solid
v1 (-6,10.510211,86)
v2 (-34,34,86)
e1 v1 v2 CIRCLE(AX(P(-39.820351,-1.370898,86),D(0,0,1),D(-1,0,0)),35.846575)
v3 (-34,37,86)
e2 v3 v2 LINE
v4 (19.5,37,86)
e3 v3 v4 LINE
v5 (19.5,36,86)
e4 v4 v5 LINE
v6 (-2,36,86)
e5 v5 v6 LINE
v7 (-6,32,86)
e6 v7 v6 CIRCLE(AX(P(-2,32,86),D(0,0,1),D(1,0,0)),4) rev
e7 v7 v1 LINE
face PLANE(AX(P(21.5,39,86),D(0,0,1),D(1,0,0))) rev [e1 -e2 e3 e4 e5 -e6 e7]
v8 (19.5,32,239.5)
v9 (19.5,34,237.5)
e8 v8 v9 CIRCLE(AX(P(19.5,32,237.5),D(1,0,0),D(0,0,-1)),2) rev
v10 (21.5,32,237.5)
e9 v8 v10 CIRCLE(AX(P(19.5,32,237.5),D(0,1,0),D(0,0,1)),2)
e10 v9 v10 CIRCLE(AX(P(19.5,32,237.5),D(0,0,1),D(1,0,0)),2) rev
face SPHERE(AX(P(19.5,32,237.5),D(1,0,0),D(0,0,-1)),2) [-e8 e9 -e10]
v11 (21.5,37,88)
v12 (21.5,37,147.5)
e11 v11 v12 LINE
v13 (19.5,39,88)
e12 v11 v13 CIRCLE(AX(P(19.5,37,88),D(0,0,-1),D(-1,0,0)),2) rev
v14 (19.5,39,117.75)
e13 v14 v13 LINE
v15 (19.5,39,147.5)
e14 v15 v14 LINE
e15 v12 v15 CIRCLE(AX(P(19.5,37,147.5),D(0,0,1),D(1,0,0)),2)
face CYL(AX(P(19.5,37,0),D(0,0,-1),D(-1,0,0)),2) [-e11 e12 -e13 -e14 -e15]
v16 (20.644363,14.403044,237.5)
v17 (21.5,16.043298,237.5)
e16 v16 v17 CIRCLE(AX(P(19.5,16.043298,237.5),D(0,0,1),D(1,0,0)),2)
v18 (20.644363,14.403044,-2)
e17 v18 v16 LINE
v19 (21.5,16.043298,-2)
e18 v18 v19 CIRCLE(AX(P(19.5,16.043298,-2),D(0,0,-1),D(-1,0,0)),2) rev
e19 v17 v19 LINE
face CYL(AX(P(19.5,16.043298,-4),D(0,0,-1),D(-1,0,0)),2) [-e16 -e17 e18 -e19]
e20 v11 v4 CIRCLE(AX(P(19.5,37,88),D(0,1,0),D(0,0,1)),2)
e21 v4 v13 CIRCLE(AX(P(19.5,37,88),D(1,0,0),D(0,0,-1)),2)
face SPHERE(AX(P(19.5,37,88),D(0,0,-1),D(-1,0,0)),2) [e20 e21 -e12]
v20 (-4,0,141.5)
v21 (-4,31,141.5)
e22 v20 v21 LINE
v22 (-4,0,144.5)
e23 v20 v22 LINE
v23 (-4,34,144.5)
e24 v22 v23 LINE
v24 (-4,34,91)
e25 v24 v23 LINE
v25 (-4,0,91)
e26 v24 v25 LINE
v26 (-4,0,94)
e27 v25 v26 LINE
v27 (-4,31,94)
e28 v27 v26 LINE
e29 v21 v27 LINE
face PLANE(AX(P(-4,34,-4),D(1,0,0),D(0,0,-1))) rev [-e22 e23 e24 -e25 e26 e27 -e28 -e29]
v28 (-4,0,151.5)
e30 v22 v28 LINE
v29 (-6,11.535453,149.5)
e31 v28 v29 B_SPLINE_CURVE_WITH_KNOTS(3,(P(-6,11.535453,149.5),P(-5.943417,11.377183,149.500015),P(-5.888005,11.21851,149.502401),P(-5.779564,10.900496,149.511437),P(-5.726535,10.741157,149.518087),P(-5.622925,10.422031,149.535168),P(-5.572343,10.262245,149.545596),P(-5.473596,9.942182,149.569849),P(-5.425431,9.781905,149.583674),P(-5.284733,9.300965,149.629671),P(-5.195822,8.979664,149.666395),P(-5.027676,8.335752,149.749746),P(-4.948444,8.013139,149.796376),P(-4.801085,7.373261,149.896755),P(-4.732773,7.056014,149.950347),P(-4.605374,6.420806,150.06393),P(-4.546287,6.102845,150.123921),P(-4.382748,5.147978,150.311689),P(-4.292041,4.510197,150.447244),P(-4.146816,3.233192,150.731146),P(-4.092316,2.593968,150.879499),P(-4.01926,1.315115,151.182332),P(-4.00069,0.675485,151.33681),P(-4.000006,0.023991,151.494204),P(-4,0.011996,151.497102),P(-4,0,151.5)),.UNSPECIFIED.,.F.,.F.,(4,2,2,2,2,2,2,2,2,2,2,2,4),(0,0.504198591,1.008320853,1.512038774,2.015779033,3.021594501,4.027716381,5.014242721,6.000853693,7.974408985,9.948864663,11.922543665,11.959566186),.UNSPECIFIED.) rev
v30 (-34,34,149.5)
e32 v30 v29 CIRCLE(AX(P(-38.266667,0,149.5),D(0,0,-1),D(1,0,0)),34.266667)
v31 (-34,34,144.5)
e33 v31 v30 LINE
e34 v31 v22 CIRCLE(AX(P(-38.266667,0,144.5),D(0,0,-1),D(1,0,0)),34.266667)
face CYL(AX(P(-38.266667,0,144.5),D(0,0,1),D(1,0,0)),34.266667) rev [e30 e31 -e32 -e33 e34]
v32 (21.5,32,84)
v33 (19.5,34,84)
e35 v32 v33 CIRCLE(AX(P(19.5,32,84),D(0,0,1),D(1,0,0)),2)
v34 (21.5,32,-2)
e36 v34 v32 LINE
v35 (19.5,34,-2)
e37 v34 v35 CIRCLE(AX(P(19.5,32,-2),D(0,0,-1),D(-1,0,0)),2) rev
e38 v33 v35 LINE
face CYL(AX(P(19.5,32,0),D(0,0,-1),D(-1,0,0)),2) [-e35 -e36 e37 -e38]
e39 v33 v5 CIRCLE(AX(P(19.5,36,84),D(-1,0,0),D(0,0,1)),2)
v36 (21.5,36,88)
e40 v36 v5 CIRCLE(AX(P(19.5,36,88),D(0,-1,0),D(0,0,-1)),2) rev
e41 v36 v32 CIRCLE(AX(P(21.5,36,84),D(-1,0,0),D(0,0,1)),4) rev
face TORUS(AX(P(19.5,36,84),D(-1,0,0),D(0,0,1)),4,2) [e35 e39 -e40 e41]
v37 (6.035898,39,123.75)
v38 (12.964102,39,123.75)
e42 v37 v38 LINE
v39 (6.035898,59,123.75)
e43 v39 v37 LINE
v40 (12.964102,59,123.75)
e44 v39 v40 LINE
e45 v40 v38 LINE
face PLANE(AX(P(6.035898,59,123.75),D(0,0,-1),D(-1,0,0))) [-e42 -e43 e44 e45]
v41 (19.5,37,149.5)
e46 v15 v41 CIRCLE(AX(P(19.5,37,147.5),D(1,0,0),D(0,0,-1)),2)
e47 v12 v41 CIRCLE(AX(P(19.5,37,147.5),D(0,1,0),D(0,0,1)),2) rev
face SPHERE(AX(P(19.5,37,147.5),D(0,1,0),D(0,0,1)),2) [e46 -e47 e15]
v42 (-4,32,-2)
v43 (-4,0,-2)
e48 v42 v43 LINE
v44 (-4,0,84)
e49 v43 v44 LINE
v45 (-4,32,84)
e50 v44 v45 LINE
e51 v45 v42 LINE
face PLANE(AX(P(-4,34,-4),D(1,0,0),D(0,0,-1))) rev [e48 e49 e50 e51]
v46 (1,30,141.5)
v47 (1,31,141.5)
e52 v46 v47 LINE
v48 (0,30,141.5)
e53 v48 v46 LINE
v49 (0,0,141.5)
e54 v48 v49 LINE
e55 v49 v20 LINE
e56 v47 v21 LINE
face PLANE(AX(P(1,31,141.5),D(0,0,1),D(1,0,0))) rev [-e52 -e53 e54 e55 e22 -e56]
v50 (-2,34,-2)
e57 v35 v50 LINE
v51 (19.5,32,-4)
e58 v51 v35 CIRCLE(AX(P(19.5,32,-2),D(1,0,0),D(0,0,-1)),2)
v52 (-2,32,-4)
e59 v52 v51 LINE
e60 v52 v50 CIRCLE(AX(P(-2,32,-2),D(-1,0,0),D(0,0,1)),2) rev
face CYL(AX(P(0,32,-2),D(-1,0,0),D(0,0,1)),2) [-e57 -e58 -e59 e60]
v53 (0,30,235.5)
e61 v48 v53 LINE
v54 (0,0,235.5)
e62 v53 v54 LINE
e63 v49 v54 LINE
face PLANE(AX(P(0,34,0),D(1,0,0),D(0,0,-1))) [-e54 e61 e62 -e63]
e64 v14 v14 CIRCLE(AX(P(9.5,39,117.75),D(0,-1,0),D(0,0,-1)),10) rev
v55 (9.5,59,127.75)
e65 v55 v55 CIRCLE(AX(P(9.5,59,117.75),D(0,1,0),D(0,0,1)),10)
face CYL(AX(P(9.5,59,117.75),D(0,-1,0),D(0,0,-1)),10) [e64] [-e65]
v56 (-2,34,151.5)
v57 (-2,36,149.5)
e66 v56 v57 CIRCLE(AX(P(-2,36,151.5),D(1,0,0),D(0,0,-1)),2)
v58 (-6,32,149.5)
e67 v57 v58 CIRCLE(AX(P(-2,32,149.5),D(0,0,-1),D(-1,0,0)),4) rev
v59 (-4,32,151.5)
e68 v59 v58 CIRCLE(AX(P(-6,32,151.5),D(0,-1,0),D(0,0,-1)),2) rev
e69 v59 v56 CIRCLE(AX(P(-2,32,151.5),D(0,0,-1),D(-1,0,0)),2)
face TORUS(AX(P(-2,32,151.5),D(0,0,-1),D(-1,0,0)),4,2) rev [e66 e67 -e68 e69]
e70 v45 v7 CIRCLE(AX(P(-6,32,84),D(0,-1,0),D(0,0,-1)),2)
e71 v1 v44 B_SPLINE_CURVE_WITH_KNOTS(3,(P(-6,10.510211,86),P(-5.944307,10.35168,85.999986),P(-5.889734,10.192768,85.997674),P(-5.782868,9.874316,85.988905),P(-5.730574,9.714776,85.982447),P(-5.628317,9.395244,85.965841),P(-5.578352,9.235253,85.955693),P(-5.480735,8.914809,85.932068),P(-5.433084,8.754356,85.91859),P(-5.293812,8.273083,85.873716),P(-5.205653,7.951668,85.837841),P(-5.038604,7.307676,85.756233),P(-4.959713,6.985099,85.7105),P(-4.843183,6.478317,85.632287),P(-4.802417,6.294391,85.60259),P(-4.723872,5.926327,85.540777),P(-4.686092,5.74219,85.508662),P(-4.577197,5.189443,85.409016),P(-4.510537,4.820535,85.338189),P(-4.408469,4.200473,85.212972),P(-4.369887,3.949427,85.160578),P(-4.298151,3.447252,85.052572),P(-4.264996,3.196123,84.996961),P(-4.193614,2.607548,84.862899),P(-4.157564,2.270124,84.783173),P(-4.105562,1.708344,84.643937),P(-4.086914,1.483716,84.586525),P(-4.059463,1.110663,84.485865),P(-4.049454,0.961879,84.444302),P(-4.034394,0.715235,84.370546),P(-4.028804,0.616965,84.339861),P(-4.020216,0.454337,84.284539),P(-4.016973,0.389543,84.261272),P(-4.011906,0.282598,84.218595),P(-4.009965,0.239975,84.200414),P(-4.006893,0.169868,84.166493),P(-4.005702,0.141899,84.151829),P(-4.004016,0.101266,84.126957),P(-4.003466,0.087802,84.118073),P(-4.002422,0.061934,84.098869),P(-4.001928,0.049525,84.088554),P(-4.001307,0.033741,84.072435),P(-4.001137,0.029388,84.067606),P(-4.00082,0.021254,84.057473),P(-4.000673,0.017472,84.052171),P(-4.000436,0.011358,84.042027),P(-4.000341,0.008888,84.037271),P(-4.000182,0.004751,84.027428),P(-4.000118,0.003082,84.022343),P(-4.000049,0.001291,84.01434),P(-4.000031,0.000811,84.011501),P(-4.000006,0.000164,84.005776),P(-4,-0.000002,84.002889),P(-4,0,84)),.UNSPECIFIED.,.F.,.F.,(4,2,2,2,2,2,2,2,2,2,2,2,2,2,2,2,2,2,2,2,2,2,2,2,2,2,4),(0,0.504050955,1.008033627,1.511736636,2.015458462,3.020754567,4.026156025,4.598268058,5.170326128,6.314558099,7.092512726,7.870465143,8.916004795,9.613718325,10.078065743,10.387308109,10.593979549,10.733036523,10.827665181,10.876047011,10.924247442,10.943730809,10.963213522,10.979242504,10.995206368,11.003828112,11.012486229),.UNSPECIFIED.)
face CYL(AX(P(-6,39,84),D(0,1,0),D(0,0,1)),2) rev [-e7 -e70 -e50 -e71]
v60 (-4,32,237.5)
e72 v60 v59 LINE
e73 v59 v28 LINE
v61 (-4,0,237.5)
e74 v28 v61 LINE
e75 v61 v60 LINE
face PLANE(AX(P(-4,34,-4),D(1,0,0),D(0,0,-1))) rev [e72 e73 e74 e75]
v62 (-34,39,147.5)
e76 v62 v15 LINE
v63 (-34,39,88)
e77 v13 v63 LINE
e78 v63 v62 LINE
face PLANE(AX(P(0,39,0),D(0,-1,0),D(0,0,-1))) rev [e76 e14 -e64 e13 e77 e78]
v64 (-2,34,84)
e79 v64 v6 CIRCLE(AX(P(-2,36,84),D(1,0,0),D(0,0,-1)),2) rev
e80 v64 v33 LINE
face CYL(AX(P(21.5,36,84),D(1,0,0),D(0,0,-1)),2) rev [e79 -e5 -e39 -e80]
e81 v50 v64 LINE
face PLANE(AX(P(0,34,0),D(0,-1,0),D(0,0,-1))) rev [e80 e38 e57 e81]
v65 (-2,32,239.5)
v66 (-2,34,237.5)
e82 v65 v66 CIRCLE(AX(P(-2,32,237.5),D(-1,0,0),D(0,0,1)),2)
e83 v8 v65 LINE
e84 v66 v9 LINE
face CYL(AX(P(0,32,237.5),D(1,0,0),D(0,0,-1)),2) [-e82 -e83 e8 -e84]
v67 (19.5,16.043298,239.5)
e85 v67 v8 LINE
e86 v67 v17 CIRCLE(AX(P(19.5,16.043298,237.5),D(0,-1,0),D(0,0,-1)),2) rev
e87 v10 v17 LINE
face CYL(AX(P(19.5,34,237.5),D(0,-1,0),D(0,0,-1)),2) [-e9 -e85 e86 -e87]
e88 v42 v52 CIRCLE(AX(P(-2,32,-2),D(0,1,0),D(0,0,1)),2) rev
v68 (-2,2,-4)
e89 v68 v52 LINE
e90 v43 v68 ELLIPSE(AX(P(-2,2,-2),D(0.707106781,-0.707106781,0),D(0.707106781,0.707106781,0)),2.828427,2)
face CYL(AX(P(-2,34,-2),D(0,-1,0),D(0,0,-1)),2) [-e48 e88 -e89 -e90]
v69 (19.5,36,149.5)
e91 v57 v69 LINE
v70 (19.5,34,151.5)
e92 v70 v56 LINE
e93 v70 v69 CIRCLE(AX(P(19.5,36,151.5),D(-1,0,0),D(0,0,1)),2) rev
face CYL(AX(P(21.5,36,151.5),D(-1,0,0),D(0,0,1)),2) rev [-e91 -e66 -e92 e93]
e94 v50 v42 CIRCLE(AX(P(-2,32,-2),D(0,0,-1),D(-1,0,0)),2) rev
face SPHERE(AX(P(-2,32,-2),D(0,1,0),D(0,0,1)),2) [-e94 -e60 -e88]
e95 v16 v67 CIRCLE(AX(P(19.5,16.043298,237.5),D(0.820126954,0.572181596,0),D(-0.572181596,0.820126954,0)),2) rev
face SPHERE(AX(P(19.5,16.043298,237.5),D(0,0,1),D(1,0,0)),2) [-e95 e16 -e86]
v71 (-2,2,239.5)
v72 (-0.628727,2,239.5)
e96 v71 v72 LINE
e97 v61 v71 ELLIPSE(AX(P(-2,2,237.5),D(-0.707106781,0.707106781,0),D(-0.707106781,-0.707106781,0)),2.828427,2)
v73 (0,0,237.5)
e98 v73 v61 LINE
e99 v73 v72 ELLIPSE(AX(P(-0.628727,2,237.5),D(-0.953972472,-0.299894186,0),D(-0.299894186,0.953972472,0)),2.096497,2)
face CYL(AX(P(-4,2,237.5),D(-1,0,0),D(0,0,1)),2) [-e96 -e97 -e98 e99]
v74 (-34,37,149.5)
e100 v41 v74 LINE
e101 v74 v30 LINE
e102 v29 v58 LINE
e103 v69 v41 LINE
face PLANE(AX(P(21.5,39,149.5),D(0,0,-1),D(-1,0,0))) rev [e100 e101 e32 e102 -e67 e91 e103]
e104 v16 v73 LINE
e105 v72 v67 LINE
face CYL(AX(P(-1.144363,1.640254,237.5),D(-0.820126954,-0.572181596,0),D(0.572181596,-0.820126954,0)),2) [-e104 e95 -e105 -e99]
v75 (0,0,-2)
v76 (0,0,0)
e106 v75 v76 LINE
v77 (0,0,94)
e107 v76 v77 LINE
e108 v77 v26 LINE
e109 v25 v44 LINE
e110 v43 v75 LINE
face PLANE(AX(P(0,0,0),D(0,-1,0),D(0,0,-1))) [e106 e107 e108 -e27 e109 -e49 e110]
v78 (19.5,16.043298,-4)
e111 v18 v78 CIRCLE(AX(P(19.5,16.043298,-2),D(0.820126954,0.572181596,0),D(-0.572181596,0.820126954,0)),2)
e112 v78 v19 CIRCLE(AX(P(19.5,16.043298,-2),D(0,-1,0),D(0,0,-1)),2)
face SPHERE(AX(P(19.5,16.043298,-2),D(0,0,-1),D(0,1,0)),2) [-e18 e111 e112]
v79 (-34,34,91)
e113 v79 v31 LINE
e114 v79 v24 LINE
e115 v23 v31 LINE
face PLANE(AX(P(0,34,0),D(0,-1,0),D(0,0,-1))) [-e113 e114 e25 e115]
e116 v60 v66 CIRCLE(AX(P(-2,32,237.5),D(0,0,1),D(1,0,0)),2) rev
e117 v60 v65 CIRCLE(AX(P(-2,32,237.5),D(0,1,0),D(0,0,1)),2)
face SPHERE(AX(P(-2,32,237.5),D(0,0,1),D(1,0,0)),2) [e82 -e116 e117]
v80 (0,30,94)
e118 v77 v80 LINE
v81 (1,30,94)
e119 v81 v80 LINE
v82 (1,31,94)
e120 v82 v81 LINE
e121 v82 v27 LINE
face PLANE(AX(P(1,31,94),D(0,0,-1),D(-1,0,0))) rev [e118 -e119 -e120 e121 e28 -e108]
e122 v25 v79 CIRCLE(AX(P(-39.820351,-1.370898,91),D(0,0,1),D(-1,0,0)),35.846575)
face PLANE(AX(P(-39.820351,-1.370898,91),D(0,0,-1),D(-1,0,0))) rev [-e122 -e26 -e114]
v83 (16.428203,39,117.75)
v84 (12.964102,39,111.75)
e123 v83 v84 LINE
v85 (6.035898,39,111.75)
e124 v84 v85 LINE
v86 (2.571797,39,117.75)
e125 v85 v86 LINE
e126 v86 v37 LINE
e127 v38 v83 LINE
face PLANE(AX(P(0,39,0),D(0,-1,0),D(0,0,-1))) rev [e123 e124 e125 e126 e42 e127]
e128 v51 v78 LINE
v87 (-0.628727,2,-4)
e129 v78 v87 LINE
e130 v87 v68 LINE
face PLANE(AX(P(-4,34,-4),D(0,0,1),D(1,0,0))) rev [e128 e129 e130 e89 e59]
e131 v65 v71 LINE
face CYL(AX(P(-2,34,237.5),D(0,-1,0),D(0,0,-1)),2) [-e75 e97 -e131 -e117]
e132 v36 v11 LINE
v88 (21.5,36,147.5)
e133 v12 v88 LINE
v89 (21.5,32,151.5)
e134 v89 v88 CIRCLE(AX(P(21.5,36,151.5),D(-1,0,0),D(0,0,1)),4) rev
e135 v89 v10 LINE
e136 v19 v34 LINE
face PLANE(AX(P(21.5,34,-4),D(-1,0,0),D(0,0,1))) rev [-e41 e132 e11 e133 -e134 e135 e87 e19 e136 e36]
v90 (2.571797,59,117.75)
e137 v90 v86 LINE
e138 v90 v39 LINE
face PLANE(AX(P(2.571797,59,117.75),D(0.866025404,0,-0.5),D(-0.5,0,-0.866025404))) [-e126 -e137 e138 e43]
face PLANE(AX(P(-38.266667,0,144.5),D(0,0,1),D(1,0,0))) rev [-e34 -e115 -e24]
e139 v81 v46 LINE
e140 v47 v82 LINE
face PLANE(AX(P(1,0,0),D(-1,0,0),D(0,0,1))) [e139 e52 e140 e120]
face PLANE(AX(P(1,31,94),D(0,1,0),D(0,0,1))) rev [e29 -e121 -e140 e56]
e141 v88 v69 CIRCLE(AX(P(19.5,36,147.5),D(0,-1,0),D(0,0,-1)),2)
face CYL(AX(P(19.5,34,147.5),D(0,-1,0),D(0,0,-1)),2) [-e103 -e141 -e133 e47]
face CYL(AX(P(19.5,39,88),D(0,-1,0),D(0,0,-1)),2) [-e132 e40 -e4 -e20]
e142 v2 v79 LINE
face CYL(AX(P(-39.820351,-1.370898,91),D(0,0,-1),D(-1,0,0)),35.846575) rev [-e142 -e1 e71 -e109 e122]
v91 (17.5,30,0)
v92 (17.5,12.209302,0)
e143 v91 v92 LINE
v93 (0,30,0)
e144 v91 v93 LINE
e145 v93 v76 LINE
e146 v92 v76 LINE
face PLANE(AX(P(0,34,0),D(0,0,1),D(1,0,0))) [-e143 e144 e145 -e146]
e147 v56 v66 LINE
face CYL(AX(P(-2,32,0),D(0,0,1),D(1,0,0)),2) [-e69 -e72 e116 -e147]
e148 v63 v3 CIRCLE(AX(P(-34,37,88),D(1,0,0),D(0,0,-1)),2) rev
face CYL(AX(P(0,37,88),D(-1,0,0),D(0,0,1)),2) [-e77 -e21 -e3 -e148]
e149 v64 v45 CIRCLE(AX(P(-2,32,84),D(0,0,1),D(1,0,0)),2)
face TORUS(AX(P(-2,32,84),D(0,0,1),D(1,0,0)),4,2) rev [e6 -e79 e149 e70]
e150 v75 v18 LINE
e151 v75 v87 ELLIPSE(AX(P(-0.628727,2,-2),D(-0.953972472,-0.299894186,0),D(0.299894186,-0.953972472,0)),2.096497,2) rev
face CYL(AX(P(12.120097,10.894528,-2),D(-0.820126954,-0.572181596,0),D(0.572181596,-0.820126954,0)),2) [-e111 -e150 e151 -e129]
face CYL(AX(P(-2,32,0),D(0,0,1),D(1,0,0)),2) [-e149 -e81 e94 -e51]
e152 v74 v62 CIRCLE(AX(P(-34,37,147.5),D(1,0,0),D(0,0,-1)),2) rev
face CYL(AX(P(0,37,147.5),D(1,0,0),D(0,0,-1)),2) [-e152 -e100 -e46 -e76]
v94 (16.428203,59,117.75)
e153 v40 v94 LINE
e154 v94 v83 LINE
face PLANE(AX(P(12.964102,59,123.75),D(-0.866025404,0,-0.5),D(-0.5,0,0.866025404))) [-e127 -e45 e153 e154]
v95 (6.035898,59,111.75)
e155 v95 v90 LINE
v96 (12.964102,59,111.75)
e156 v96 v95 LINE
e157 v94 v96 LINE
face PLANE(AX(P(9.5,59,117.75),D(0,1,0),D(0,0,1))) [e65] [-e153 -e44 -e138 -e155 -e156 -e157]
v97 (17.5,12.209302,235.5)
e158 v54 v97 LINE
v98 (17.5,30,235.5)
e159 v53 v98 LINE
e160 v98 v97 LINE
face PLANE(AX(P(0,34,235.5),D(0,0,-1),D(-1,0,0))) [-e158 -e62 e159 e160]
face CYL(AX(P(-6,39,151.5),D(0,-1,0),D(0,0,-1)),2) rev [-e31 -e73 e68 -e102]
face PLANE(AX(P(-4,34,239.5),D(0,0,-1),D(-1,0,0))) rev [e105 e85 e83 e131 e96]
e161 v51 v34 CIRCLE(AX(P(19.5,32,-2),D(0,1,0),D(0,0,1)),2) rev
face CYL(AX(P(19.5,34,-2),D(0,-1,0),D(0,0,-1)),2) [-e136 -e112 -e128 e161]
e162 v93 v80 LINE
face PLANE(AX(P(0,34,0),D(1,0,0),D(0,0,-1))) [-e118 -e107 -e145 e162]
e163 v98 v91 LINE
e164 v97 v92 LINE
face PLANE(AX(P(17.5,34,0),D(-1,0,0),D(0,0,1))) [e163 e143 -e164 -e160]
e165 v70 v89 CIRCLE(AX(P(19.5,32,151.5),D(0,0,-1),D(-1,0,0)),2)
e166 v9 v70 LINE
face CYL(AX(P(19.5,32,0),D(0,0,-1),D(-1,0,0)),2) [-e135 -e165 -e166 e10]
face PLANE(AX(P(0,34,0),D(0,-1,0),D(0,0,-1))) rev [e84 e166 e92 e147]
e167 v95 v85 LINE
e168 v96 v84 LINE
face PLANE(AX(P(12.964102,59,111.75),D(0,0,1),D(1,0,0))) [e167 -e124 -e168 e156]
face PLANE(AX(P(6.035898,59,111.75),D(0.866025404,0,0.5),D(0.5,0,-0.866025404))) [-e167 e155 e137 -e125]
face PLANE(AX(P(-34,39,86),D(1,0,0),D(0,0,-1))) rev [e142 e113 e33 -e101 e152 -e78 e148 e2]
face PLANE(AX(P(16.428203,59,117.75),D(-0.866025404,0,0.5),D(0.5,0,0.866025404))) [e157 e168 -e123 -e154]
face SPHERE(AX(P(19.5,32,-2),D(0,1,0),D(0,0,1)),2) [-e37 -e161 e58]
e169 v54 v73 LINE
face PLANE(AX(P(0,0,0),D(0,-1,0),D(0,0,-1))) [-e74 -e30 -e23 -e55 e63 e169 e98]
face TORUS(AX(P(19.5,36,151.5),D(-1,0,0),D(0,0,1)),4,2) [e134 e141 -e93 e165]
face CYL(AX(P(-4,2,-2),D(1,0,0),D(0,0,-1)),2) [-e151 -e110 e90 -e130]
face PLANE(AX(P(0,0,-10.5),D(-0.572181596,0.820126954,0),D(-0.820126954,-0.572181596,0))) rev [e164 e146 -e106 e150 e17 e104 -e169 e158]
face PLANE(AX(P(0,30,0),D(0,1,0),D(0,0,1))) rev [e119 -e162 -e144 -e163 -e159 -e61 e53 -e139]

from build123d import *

# Parameters (mm, degrees)
SKETCH1_W                         = 25.5
SKETCH1_H                         = 243.5
SKETCH1_W_2                       = 17.5
SKETCH1_H_2                       = 235.5
MOTOR_PANEL_CONNECTOR_DEPTH       = 34
SKETCH3_W                         = 25.5
SKETCH3_H                         = 243.5
MOTOR_PANEL_CONNECCTOR_BASE_DEPTH = 4
UP_DOWN_CONNECT_CUT_DEPTH         = 250
SKETCH5_W                         = 47.5
SKETCH5_H                         = 31
CUT_TO_NAIL_PART_DEPTH            = 5
SKETCH6_W                         = 55.5
SKETCH6_H                         = 63.5
PANEL_CONNECTOR_DEPTH             = 5
SKETCH7_R                         = 10
BOSS_EXTRUDE4_DEPTH               = 20
BOSS_EXTRUDE5_DEPTH               = 5
BOSS_EXTRUDE6_DEPTH               = 5
FILLET1_R                         = 2


with BuildPart() as part:
    # Sketch1 → motor -panel connector (new body)
    with BuildSketch(Plane(origin=(0, 0, 0), x_dir=(1, 0, 0), z_dir=(0, 1, 0))):
        with Locations((8.75, -117.75)):
            Rectangle(SKETCH1_W, SKETCH1_H)
        with Locations((8.75, -117.75)):
            Rectangle(SKETCH1_W_2, SKETCH1_H_2, mode=Mode.SUBTRACT)
    extrude(amount=MOTOR_PANEL_CONNECTOR_DEPTH)

    # Sketch3 → motor-panel connecctor base (add)
    with BuildSketch(Plane(origin=(0, 34, 0), x_dir=(1, 0, 0), z_dir=(0, 1, 0))):
        with Locations((8.75, -117.75)):
            Rectangle(SKETCH3_W, SKETCH3_H)
    extrude(amount=-MOTOR_PANEL_CONNECCTOR_BASE_DEPTH)

    # Sketch4 → up down connect cut (cut)
    with BuildSketch(Plane.XY.offset(239.5)):
        Polygon((0, 0), (21.5, 15), (21.5, 0), align=None)
    extrude(amount=-UP_DOWN_CONNECT_CUT_DEPTH, mode=Mode.SUBTRACT)

    # Sketch5 → cut to nail part (cut)
    with BuildSketch(Plane.ZY.offset(4)):
        with Locations((117.75, 15.5)):
            Rectangle(SKETCH5_W, SKETCH5_H)
    extrude(amount=-CUT_TO_NAIL_PART_DEPTH, mode=Mode.SUBTRACT)

    # Sketch6 → panel connector (add)
    with BuildSketch(Plane(origin=(0, 34, 0), x_dir=(1, 0, 0), z_dir=(0, 1, 0))):
        with Locations((-6.25, -117.75)):
            Rectangle(SKETCH6_W, SKETCH6_H)
    extrude(amount=PANEL_CONNECTOR_DEPTH)

    # Sketch7 → Boss-Extrude4 (add)
    with BuildSketch(Plane(origin=(0, 39, 0), x_dir=(1, 0, 0), z_dir=(0, 1, 0))):
        with Locations(Location((9.5, -117.75, 0), (0, 0, 90))):
            Circle(SKETCH7_R)
        Polygon((12.964101615, -123.75), (16.42820323, -117.75), (12.964101615, -111.75), (6.035898385, -111.75), (2.57179677, -117.75), (6.035898385, -123.75), align=None, mode=Mode.SUBTRACT)
    extrude(amount=BOSS_EXTRUDE4_DEPTH)

    # Sketch8 → Boss-Extrude5 (add)
    with BuildSketch(Plane.XY.offset(149.5)):
        with BuildLine():
            Line((-34, 34), (-4, 34))
            Line((-4, 34), (-4, 0))
            ThreePointArc((-4, 0), (-12.572222823, 22.671568098), (-34, 34))
        make_face()
    extrude(amount=-BOSS_EXTRUDE5_DEPTH)

    # Sketch13 → Boss-Extrude6 (add)
    with BuildSketch(Plane(origin=(0, 0, 86), x_dir=(-1, 0, 0), z_dir=(0, 0, -1))):
        with BuildLine():
            Line((4, 0), (4, 34))
            Line((4, 34), (34, 34))
            ThreePointArc((34, 34), (12.941232514, 22.345971311), (4, 0))
        make_face()
    extrude(amount=-BOSS_EXTRUDE6_DEPTH)

    # Fillet1
    # the kernel refuses this fillet: 2 mm, written as the material it takes off along each edge
    with BuildSketch(Plane(origin=(-2, 32, 237.5), x_dir=(0, 1, 0), z_dir=(-1, 0, 0))) as fillet1_piece_1_section:
        Polygon((0, 0), (FILLET1_R * 1.02, 0), (FILLET1_R * 1.02, -FILLET1_R * 1.02), (0, -FILLET1_R * 1.02), align=None)
    fillet1_piece_1 = extrude(amount=FILLET1_R * 1.02, mode=Mode.PRIVATE)
    fillet1_piece_1 = fillet1_piece_1 - Plane(origin=(-2, 32, 237.5), x_dir=(0, -0.7071067811865475, -0.7071067811865475), z_dir=(-1, 0, 0)) * Sphere(FILLET1_R, mode=Mode.PRIVATE)
    add(fillet1_piece_1, mode=Mode.SUBTRACT)
    with BuildSketch(Plane(origin=(-2, 32, -2), x_dir=(0, 1, 0), z_dir=(-1, 0, 0))) as fillet1_piece_2_section:
        Polygon((0, 0), (FILLET1_R * 1.02, 0), (FILLET1_R * 1.02, FILLET1_R * 1.02), (0, FILLET1_R * 1.02), align=None)
    fillet1_piece_2 = extrude(amount=FILLET1_R * 1.02, mode=Mode.PRIVATE)
    fillet1_piece_2 = fillet1_piece_2 - Plane(origin=(-2, 32, -2), x_dir=(0, -0.7071067811865475, 0.7071067811865475), z_dir=(-1, 0, 0)) * Sphere(FILLET1_R, mode=Mode.PRIVATE)
    add(fillet1_piece_2, mode=Mode.SUBTRACT)
    with BuildSketch(Plane(origin=(19.5, 16.043297996, 237.5), x_dir=(0.5721815960240814, -0.8201269543011832, 0), z_dir=(0, 0, 1))) as fillet1_piece_3_section:
        Polygon((0, 0), (FILLET1_R * 1.02, 0), (FILLET1_R * 1.02, FILLET1_R * 0.532081978), (FILLET1_R * 0.583625227945, FILLET1_R * 0.836529493387), align=None)
    fillet1_piece_3 = extrude(amount=FILLET1_R * 1.02, mode=Mode.PRIVATE)
    fillet1_piece_3 = fillet1_piece_3 - Plane(origin=(19.5, 16.043297996, 237.5), x_dir=(-0.886617616569872, 0.4625031913273241, 0), z_dir=(0, 0, 1)) * Sphere(FILLET1_R, mode=Mode.PRIVATE)
    add(fillet1_piece_3, mode=Mode.SUBTRACT)
    with BuildSketch(Plane(origin=(19.5, 16.043297996, -2), x_dir=(0.5721815960240814, -0.8201269543011832, 0), z_dir=(0, 0, -1))) as fillet1_piece_4_section:
        Polygon((0, 0), (FILLET1_R * 1.02, 0), (FILLET1_R * 1.02, -FILLET1_R * 0.532081978), (FILLET1_R * 0.583625227945, -FILLET1_R * 0.836529493387), align=None)
    fillet1_piece_4 = extrude(amount=FILLET1_R * 1.02, mode=Mode.PRIVATE)
    fillet1_piece_4 = fillet1_piece_4 - Plane(origin=(19.5, 16.043297996, -2), x_dir=(-0.886617616569872, 0.4625031913273241, 0), z_dir=(0, 0, -1)) * Sphere(FILLET1_R, mode=Mode.PRIVATE)
    add(fillet1_piece_4, mode=Mode.SUBTRACT)
    with BuildSketch(Plane(origin=(21.5, 39, 154.5), x_dir=(0, -1, 0), z_dir=(0, 0, -1))) as fillet1_piece_5:
        with BuildLine():
            CenterArc((FILLET1_R, FILLET1_R), FILLET1_R, 180, 90)
            Line((0, FILLET1_R), (0, 0))
            Line((0, 0), (FILLET1_R, 0))
        make_face()
    extrude(amount=73.5, mode=Mode.SUBTRACT)
    with BuildSketch(Plane(origin=(26.5, 39, 86), x_dir=(0, -1, 0), z_dir=(-1, 0, 0))) as fillet1_piece_6:
        with BuildLine():
            CenterArc((FILLET1_R, FILLET1_R), FILLET1_R, 180, 90)
            Line((0, FILLET1_R), (0, 0))
            Line((0, 0), (FILLET1_R, 0))
        make_face()
    extrude(amount=65.5, mode=Mode.SUBTRACT)
    with BuildSketch(Plane(origin=(-39, 39, 149.5), x_dir=(0, 0, -1), z_dir=(1, 0, 0))) as fillet1_piece_7:
        with BuildLine():
            CenterArc((FILLET1_R, -FILLET1_R), FILLET1_R, 90, 90)
            Line((0, -FILLET1_R), (0, 0))
            Line((0, 0), (FILLET1_R, 0))
        make_face()
    extrude(amount=65.5, mode=Mode.SUBTRACT)
    with BuildSketch(Plane(origin=(-2, 34, 239.5), x_dir=(0, -1, 0), z_dir=(1, 0, 0))) as fillet1_piece_8:
        with BuildLine():
            CenterArc((FILLET1_R, FILLET1_R), FILLET1_R, 180, 90)
            Line((0, FILLET1_R), (0, 0))
            Line((0, 0), (FILLET1_R, 0))
        make_face()
    extrude(amount=28.5, mode=Mode.SUBTRACT)
    with BuildSketch(Plane(origin=(26.5, 34, -4), x_dir=(0, 0, 1), z_dir=(-1, 0, 0))) as fillet1_piece_9:
        with BuildLine():
            CenterArc((FILLET1_R, -FILLET1_R), FILLET1_R, 90, 90)
            Line((0, -FILLET1_R), (0, 0))
            Line((0, 0), (FILLET1_R, 0))
        make_face()
    extrude(amount=28.5, mode=Mode.SUBTRACT)
    with BuildSketch(Plane(origin=(21.5, 15, 237.5), x_dir=(-0.8201269543011818, -0.5721815960240832, 0), z_dir=(0, 0, -1))) as fillet1_piece_10:
        with BuildLine():
            CenterArc((FILLET1_R * 0.521648998039, FILLET1_R), FILLET1_R, 214.902495616, 55.097504384)
            Line((-FILLET1_R * 0.298477956262, FILLET1_R * 0.427818403976), (0, 0))
            Line((0, 0), (FILLET1_R * 0.521648998039, 0))
        make_face()
    extrude(amount=239.5, mode=Mode.SUBTRACT)
    with BuildSketch(Plane(origin=(-9, 0, 239.5), x_dir=(0, 1, 0), z_dir=(1, 0, 0))) as fillet1_piece_11:
        with BuildLine():
            CenterArc((FILLET1_R, -FILLET1_R), FILLET1_R, 90, 90)
            Line((0, -FILLET1_R), (0, 0))
            Line((0, 0), (FILLET1_R, 0))
        make_face()
    extrude(amount=14, mode=Mode.SUBTRACT)
    with BuildSketch(Plane(origin=(5, 0, -4), x_dir=(0, 0, 1), z_dir=(-1, 0, 0))) as fillet1_piece_12:
        with BuildLine():
            CenterArc((FILLET1_R, FILLET1_R), FILLET1_R, 180, 90)
            Line((0, FILLET1_R), (0, 0))
            Line((0, 0), (FILLET1_R, 0))
        make_face()
    extrude(amount=14, mode=Mode.SUBTRACT)
    with BuildSketch(Plane(origin=(-4.100634772, -2.86090798, -4), x_dir=(-0.5721815960240814, 0.8201269543011832, 0), z_dir=(0.8201269543011832, 0.5721815960240814, 0)), Plane(origin=(-4.100634772, -2.86090798, 239.5), x_dir=(0, 0, -1), z_dir=(0.8201269543011832, 0.5721815960240814, 0))) as fillet1_piece_13:
        with BuildLine():
            CenterArc((FILLET1_R, FILLET1_R), FILLET1_R, 180, 90)
            Line((0, FILLET1_R), (0, 0))
            Line((0, 0), (FILLET1_R, 0))
        make_face()
    extrude(amount=30.172155462, mode=Mode.SUBTRACT)
    with BuildSketch(Plane(origin=(21.5, 39, -4), x_dir=(-1, 0, 0), z_dir=(0, -1, 0))) as fillet1_piece_14:
        with BuildLine():
            CenterArc((FILLET1_R, -FILLET1_R), FILLET1_R, 90, 90)
            Line((0, -FILLET1_R), (0, 0))
            Line((0, 0), (FILLET1_R, 0))
        make_face()
    extrude(amount=22.956702004, mode=Mode.SUBTRACT)
    with BuildSketch(Plane(origin=(21.5, 16.043297996, 239.5), x_dir=(0, 0, -1), z_dir=(0, 1, 0))) as fillet1_piece_15:
        with BuildLine():
            CenterArc((FILLET1_R, FILLET1_R), FILLET1_R, 180, 90)
            Line((0, FILLET1_R), (0, 0))
            Line((0, 0), (FILLET1_R, 0))
        make_face()
    extrude(amount=22.956702004, mode=Mode.SUBTRACT)
    with BuildSketch(Plane(origin=(-4, -5, 239.5), x_dir=(1, 0, 0), z_dir=(0, 1, 0))) as fillet1_piece_16:
        with BuildLine():
            CenterArc((FILLET1_R, FILLET1_R), FILLET1_R, 180, 90)
            Line((0, FILLET1_R), (0, 0))
            Line((0, 0), (FILLET1_R, 0))
        make_face()
    extrude(amount=37, mode=Mode.SUBTRACT)
    with BuildSketch(Plane(origin=(-4, 32, -4), x_dir=(0, 0, 1), z_dir=(0, -1, 0))) as fillet1_piece_17:
        with BuildLine():
            CenterArc((FILLET1_R, -FILLET1_R), FILLET1_R, 90, 90)
            Line((0, -FILLET1_R), (0, 0))
            Line((0, 0), (FILLET1_R, 0))
        make_face()
    extrude(amount=37, mode=Mode.SUBTRACT)
    with BuildSketch(Plane(origin=(-4, 34, -2), x_dir=(0, -1, 0), z_dir=(0, 0, 1))) as fillet1_piece_18:
        with BuildLine():
            CenterArc((FILLET1_R, FILLET1_R), FILLET1_R, 180, 90)
            Line((0, FILLET1_R), (0, 0))
            Line((0, 0), (FILLET1_R, 0))
        make_face()
    extrude(amount=88, mode=Mode.SUBTRACT)
    with BuildSketch(Plane(origin=(-4, 34, 149.5), x_dir=(1, 0, 0), z_dir=(0, 0, 1))) as fillet1_piece_19:
        with BuildLine():
            CenterArc((FILLET1_R, -FILLET1_R), FILLET1_R, 90, 90)
            Line((0, -FILLET1_R), (0, 0))
            Line((0, 0), (FILLET1_R, 0))
        make_face()
    extrude(amount=88, mode=Mode.SUBTRACT)
    # the kernel refuses this fillet: 2 mm, written as the material it adds along each edge
    with BuildSketch(Plane(origin=(-4, 32, 149.5), x_dir=(-1, 0, 0), z_dir=(0, -1, 0))) as fillet1_2_piece_1_section:
        with BuildLine():
            CenterArc((FILLET1_R, -FILLET1_R), FILLET1_R, 90, 90)
            Line((0, -FILLET1_R), (0, 0))
            Line((0, 0), (FILLET1_R, 0))
        make_face()
    fillet1_2_piece_1 = extrude(amount=32, mode=Mode.PRIVATE)
    fillet1_2_piece_1 = fillet1_2_piece_1 - Plane(origin=(-38.266666667, 0, 149.967222139), x_dir=(1, 0, 0), z_dir=(0, 0, 1)) * Cylinder(34.266666667, 72, mode=Mode.PRIVATE)
    add(fillet1_2_piece_1)
    with BuildSketch(Plane(origin=(-4, 0, 86), x_dir=(0, 0, -1), z_dir=(0, 1, 0))) as fillet1_2_piece_2_section:
        with BuildLine():
            CenterArc((FILLET1_R, FILLET1_R), FILLET1_R, 180, 90)
            Line((0, FILLET1_R), (0, 0))
            Line((0, 0), (FILLET1_R, 0))
        make_face()
    fillet1_2_piece_2 = extrude(amount=32, mode=Mode.PRIVATE)
    fillet1_2_piece_2 = fillet1_2_piece_2 - Plane(origin=(-39.820351429, -1.370898319, 85.534344582), x_dir=(0.16236841120732118, 0.9867302058019762, 0), z_dir=(0, 0, -1)) * Cylinder(35.846574992, 73, mode=Mode.PRIVATE)
    add(fillet1_2_piece_2)
    with BuildSketch(Plane(origin=(-2, 34, 149.5), x_dir=(0, 1, 0), z_dir=(1, 0, 0)), Plane(origin=(21.5, 34, 86), x_dir=(0, 1, 0), z_dir=(-1, 0, 0))) as fillet1_2_piece_3:
        with BuildLine():
            CenterArc((FILLET1_R, FILLET1_R), FILLET1_R, 180, 90)
            Line((0, FILLET1_R), (0, 0))
            Line((0, 0), (FILLET1_R, 0))
        make_face()
    extrude(amount=23.5)
    with BuildSketch(Plane(origin=(-2, 32, 86), x_dir=(-1, 0, 0), z_dir=(0, -1, 0))) as fillet1_2_piece_4:
        with BuildLine():
            CenterArc((2 + FILLET1_R, FILLET1_R), FILLET1_R, 180, 90)
            Line((2, FILLET1_R), (2, 0))
            Line((2, 0), (2 + FILLET1_R, 0))
        make_face()
    revolve(axis=Axis((-2, 32, 86), (0, 0, -1)), revolution_arc=90)
    with BuildSketch(Plane(origin=(-2, 32, 149.5), x_dir=(0, 1, 0), z_dir=(1, 0, 0))) as fillet1_2_piece_5:
        with BuildLine():
            CenterArc((2 + FILLET1_R, FILLET1_R), FILLET1_R, 180, 90)
            Line((2, FILLET1_R), (2, 0))
            Line((2, 0), (2 + FILLET1_R, 0))
        make_face()
    revolve(axis=Axis((-2, 32, 149.5), (0, 0, 1)), revolution_arc=90)
    # the kernel refuses this fillet: 2 mm, written as the material it takes off along each edge
    with BuildSketch(Plane(origin=(19.5, 37, 88), x_dir=(0, 0, -1), z_dir=(1, 0, 0))) as fillet1_3_piece_1_section:
        Polygon((0, 0), (FILLET1_R * 1.02, 0), (FILLET1_R * 1.02, FILLET1_R * 1.02), (0, FILLET1_R * 1.02), align=None)
    fillet1_3_piece_1 = extrude(amount=FILLET1_R * 1.02, mode=Mode.PRIVATE)
    fillet1_3_piece_1 = fillet1_3_piece_1 - Plane(origin=(19.5, 37, 88), x_dir=(0, -0.7071067811865475, 0.7071067811865475), z_dir=(1, 0, 0)) * Sphere(FILLET1_R, mode=Mode.PRIVATE)
    add(fillet1_3_piece_1, mode=Mode.SUBTRACT)
    with BuildSketch(Plane(origin=(19.5, 37, 147.5), x_dir=(0, 0, 1), z_dir=(1, 0, 0))) as fillet1_3_piece_2_section:
        Polygon((0, 0), (FILLET1_R * 1.02, 0), (FILLET1_R * 1.02, -FILLET1_R * 1.02), (0, -FILLET1_R * 1.02), align=None)
    fillet1_3_piece_2 = extrude(amount=FILLET1_R * 1.02, mode=Mode.PRIVATE)
    fillet1_3_piece_2 = fillet1_3_piece_2 - Plane(origin=(19.5, 37, 147.5), x_dir=(0, -0.7071067811865475, -0.7071067811865475), z_dir=(1, 0, 0)) * Sphere(FILLET1_R, mode=Mode.PRIVATE)
    add(fillet1_3_piece_2, mode=Mode.SUBTRACT)
    with BuildSketch(Plane(origin=(19.5, 32, -2), x_dir=(0, 1, 0), z_dir=(1, 0, 0))) as fillet1_3_piece_3_section:
        Polygon((0, 0), (FILLET1_R * 1.02, 0), (FILLET1_R * 1.02, -FILLET1_R * 1.02), (0, -FILLET1_R * 1.02), align=None)
    fillet1_3_piece_3 = extrude(amount=FILLET1_R * 1.02, mode=Mode.PRIVATE)
    fillet1_3_piece_3 = fillet1_3_piece_3 - Plane(origin=(19.5, 32, -2), x_dir=(0, -0.7071067811865475, 0.7071067811865475), z_dir=(1, 0, 0)) * Sphere(FILLET1_R, mode=Mode.PRIVATE)
    add(fillet1_3_piece_3, mode=Mode.SUBTRACT)
    with BuildSketch(Plane(origin=(19.5, 32, 237.5), x_dir=(0, 1, 0), z_dir=(1, 0, 0))) as fillet1_3_piece_4_section:
        Polygon((0, 0), (FILLET1_R * 1.02, 0), (FILLET1_R * 1.02, FILLET1_R * 1.02), (0, FILLET1_R * 1.02), align=None)
    fillet1_3_piece_4 = extrude(amount=FILLET1_R * 1.02, mode=Mode.PRIVATE)
    fillet1_3_piece_4 = fillet1_3_piece_4 - Plane(origin=(19.5, 32, 237.5), x_dir=(0, -0.7071067811865475, -0.7071067811865475), z_dir=(1, 0, 0)) * Sphere(FILLET1_R, mode=Mode.PRIVATE)
    add(fillet1_3_piece_4, mode=Mode.SUBTRACT)
    with BuildSketch(Plane(origin=(21.5, 34, 237.5), x_dir=(0, -1, 0), z_dir=(0, 0, -1)), Plane(origin=(21.5, 34, 84), x_dir=(0, -1, 0), z_dir=(0, 0, -1))) as fillet1_3_piece_5:
        with BuildLine():
            CenterArc((FILLET1_R, FILLET1_R), FILLET1_R, 180, 90)
            Line((0, FILLET1_R), (0, 0))
            Line((0, 0), (FILLET1_R, 0))
        make_face()
    extrude(amount=86, mode=Mode.SUBTRACT)
    with BuildSketch(Plane(origin=(21.5, 36, 149.5), x_dir=(0, 0, -1), z_dir=(0, 1, 0))) as fillet1_3_piece_6:
        with BuildLine():
            CenterArc((FILLET1_R, FILLET1_R), FILLET1_R, 180, 90)
            Line((0, FILLET1_R), (0, 0))
            Line((0, 0), (FILLET1_R, 0))
        make_face()
    extrude(amount=1, mode=Mode.SUBTRACT)
    with BuildSketch(Plane(origin=(21.5, 36, 86), x_dir=(0, 0, 1), z_dir=(0, 1, 0))) as fillet1_3_piece_7:
        with BuildLine():
            CenterArc((FILLET1_R, -FILLET1_R), FILLET1_R, 90, 90)
            Line((0, -FILLET1_R), (0, 0))
            Line((0, 0), (FILLET1_R, 0))
        make_face()
    extrude(amount=1, mode=Mode.SUBTRACT)
    with BuildSketch(Plane(origin=(21.5, 36, 84), x_dir=(0, 0, 1), z_dir=(0, 1, 0))) as fillet1_3_piece_8:
        with BuildLine():
            CenterArc((2 + FILLET1_R, -FILLET1_R), FILLET1_R, 90, 90)
            Line((2, -FILLET1_R), (2, 0))
            Line((2, 0), (2 + FILLET1_R, 0))
        make_face()
    revolve(axis=Axis((21.5, 36, 84), (1, 0, 0)), revolution_arc=90, mode=Mode.SUBTRACT)
    with BuildSketch(Plane(origin=(21.5, 36, 151.5), x_dir=(0, 0, -1), z_dir=(0, 1, 0))) as fillet1_3_piece_9:
        with BuildLine():
            CenterArc((2 + FILLET1_R, FILLET1_R), FILLET1_R, 180, 90)
            Line((2, FILLET1_R), (2, 0))
            Line((2, 0), (2 + FILLET1_R, 0))
        make_face()
    revolve(axis=Axis((21.5, 36, 151.5), (-1, 0, 0)), revolution_arc=90, mode=Mode.SUBTRACT)


solid = part.part
